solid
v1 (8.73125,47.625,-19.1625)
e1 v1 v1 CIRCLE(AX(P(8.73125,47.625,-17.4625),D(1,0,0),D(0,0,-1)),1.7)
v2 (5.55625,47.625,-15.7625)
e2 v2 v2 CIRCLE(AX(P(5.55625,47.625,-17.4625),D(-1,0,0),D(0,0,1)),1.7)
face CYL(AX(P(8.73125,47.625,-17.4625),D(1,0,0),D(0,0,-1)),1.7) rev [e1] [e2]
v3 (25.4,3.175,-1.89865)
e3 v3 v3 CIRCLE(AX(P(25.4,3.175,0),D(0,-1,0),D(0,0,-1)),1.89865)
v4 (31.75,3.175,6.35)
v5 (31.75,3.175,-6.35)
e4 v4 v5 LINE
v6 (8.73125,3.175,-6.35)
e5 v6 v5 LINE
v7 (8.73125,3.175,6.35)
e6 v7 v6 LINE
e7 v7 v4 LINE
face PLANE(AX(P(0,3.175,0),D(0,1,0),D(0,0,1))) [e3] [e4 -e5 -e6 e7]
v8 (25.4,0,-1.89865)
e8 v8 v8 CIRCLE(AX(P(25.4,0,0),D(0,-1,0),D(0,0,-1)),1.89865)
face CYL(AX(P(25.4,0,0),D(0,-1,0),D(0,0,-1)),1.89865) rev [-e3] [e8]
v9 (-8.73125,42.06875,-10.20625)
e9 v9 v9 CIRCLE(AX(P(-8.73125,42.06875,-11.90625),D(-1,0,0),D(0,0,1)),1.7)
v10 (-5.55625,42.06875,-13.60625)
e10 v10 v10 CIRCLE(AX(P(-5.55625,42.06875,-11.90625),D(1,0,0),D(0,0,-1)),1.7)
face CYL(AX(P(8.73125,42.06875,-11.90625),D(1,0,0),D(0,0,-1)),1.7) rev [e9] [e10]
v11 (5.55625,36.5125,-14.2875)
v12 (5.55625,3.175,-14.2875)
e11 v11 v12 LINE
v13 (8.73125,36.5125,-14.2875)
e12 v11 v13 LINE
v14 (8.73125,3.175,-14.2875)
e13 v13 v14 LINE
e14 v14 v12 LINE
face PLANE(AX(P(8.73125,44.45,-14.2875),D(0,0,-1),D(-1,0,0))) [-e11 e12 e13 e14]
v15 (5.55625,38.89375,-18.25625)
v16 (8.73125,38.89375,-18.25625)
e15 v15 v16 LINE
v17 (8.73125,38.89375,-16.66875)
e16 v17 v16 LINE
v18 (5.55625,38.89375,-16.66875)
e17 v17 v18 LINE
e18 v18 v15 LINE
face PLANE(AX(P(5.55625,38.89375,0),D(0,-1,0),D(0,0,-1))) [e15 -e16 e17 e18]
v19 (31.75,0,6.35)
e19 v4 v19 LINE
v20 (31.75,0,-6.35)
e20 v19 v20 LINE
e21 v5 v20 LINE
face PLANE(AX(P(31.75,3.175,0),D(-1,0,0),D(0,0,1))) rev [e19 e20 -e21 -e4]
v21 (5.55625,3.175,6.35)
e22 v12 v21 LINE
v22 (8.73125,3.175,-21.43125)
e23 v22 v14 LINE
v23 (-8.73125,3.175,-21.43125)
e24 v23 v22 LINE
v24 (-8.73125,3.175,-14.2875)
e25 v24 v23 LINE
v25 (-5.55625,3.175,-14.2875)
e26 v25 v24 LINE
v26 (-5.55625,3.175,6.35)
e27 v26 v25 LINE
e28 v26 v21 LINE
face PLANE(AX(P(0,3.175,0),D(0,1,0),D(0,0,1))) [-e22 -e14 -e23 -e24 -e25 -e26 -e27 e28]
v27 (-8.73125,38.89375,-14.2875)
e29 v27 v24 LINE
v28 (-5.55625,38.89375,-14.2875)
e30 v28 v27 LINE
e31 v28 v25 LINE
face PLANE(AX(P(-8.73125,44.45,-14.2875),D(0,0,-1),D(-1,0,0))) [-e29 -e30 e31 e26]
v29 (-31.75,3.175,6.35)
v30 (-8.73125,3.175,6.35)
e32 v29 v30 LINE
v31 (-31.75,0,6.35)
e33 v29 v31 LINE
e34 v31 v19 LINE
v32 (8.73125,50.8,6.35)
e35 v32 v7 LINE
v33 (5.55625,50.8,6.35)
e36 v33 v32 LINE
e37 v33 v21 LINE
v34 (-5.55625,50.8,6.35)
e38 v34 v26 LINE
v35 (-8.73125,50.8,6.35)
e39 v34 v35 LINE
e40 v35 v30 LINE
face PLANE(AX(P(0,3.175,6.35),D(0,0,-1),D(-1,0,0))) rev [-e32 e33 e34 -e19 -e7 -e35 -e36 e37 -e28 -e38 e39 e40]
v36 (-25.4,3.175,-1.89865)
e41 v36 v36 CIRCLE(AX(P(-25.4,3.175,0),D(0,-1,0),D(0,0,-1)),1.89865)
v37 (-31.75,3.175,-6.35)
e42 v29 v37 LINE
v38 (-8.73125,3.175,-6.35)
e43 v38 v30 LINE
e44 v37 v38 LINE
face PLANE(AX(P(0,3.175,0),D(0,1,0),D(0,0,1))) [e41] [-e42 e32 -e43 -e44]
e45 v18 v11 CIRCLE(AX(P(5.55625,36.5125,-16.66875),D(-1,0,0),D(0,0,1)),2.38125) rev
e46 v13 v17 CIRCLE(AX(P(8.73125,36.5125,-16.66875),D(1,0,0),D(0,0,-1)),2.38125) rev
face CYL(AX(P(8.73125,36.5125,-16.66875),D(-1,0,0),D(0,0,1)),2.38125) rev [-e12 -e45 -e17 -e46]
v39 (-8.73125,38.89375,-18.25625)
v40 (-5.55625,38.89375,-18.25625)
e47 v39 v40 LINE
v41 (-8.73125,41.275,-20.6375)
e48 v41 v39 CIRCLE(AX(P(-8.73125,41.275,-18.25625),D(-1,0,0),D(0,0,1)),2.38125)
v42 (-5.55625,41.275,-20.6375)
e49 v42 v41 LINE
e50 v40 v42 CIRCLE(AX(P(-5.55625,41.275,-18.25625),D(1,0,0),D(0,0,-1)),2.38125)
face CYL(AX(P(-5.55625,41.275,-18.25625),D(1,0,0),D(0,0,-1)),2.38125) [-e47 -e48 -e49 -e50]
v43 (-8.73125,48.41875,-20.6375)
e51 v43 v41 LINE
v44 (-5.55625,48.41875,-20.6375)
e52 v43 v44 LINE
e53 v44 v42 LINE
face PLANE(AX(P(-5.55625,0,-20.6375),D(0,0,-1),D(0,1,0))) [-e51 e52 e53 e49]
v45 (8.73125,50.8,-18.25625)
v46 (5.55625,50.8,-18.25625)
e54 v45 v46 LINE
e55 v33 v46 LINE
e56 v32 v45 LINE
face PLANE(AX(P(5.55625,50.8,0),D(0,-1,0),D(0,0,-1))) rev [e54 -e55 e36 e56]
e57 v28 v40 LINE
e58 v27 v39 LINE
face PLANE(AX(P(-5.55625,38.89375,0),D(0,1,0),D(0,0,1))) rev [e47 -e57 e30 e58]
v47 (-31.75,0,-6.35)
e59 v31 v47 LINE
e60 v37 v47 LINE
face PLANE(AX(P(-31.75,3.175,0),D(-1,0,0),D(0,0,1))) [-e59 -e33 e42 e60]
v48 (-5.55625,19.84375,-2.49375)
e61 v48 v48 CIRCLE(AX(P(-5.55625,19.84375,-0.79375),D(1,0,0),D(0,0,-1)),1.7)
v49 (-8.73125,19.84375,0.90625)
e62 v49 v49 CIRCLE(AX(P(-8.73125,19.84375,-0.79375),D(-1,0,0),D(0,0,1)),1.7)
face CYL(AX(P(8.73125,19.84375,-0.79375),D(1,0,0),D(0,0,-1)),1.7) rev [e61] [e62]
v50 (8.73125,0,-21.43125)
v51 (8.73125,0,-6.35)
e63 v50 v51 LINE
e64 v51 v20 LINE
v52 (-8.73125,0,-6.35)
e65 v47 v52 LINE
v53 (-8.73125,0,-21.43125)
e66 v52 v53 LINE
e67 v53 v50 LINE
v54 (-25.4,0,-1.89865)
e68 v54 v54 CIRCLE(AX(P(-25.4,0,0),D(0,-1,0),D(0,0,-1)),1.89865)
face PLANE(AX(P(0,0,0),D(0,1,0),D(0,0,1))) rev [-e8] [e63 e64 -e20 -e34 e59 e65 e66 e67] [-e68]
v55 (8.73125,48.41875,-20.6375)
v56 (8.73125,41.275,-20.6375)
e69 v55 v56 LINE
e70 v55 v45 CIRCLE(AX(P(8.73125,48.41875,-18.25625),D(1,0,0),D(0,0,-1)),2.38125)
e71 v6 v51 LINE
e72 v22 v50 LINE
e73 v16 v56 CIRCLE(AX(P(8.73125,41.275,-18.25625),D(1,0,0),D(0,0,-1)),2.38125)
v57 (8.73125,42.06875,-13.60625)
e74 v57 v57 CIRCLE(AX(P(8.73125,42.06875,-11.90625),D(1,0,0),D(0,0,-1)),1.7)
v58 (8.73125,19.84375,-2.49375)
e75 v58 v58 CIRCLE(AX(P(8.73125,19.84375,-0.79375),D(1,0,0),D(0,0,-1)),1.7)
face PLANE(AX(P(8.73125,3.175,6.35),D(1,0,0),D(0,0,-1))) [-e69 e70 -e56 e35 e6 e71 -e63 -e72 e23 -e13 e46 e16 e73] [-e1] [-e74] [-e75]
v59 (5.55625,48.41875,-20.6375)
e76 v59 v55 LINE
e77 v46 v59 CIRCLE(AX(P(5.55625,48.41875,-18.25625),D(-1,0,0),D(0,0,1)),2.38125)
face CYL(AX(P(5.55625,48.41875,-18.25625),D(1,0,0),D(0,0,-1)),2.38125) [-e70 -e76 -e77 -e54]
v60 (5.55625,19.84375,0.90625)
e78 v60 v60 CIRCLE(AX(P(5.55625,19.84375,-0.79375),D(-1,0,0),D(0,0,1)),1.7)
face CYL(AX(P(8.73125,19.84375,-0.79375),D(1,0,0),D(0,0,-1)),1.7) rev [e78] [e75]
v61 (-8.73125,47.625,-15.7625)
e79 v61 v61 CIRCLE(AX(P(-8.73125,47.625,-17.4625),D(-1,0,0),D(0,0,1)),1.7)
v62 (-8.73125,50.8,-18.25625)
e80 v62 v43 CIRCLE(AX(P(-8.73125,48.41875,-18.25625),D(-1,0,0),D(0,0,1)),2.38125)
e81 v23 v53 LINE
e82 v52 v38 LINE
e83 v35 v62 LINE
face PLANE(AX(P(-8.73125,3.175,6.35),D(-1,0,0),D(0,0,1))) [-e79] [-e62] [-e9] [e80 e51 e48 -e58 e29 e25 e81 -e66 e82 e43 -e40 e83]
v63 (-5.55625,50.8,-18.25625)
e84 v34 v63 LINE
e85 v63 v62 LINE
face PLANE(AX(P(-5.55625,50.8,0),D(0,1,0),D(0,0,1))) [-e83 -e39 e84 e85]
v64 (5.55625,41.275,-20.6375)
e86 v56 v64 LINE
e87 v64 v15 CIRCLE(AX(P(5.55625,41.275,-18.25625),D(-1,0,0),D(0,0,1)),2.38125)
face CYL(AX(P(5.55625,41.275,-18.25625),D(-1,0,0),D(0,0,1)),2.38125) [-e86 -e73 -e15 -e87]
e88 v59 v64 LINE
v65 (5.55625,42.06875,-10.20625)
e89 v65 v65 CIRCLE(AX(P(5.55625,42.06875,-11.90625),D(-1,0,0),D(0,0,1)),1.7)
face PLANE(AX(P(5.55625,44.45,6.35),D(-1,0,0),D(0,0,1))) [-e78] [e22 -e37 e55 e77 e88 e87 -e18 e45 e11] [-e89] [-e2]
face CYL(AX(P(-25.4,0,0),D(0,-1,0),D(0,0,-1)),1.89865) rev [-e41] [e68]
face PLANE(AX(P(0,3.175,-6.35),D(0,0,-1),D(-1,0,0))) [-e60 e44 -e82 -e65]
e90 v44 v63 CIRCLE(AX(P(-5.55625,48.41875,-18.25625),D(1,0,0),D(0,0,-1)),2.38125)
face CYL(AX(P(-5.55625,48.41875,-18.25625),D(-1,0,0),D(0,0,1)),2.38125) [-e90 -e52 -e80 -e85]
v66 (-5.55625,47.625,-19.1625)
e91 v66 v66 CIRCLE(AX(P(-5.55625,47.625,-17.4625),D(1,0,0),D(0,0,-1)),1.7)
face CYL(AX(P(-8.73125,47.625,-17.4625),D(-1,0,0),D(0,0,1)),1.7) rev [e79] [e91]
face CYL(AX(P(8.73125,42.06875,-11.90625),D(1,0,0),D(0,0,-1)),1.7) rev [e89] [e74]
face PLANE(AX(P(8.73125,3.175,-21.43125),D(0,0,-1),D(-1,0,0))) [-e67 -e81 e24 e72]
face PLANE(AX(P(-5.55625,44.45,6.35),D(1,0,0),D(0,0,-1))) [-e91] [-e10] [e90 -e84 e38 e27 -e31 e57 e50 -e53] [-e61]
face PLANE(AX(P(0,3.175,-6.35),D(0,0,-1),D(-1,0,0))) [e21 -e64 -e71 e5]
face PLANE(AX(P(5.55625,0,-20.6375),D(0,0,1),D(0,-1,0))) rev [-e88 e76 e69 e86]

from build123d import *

# Parameters (mm, degrees)
SKETCH1_W             = 63.5
SKETCH1_H             = 6.35
BOSS_EXTRUDE1_DEPTH   = 3.175
F_6_CLEARANCE_HOLE1_D = 3.7973
SKETCH7_W             = 17.4625
SKETCH7_H             = 27.78125
BOSS_EXTRUDE2_DEPTH   = 3.175
SKETCH9_W             = 3.175
SKETCH9_H             = 20.6375
BOSS_EXTRUDE3_DEPTH   = 44.45
M3_CLEARANCE_HOLE1_D  = 3.4
SKETCH14_W            = 20.6375
SKETCH14_H            = 6.35
BOSS_EXTRUDE4_DEPTH   = 3.175
FILLET3_R             = 2.38125
M3_CLEARANCE_HOLE2_D  = 3.4
MIRROR1_START         = -8.73125
MIRROR1_OUTLINE_R     = 1.7
MIRROR1_DEPTH         = 3.175


# Read off the part's stored shape, not the designer's step: Mirror1
with BuildPart() as part:
    # Sketch1 → Boss-Extrude1 (new body)
    with BuildSketch(Plane(origin=(0, 0, 0), x_dir=(1, 0, 0), z_dir=(0, 1, 0))):
        with Locations((0, -3.175)):
            Rectangle(SKETCH1_W, SKETCH1_H)
        with Locations((0, 3.175)):
            Rectangle(SKETCH1_W, SKETCH1_H)
    extrude(amount=BOSS_EXTRUDE1_DEPTH)

    # #6 Clearance Hole1 (through all)
    with Locations(Plane(origin=(0, 0, 0), x_dir=(-1, 0, 0), z_dir=(0, -1, 0))):
        with Locations((25.4, 0), (-25.4, 0)):
            Hole(F_6_CLEARANCE_HOLE1_D / 2)

    # Sketch7 → Boss-Extrude2 (add)
    with BuildSketch(Plane.XZ):
        with Locations((0, -7.540625)):
            Rectangle(SKETCH7_W, SKETCH7_H)
    extrude(amount=-BOSS_EXTRUDE2_DEPTH)

    # Sketch9 → Boss-Extrude3 (add)
    with BuildSketch(Plane.XZ):
        with Locations((7.14375, -3.96875)):
            Rectangle(SKETCH9_W, SKETCH9_H)
        with Locations((-7.14375, -3.96875)):
            Rectangle(SKETCH9_W, SKETCH9_H)
    extrude(amount=-BOSS_EXTRUDE3_DEPTH)

    # M3 Clearance Hole1 (through all)
    with Locations(Plane(origin=(8.73125, 0, 0), x_dir=(0, 0, -1), z_dir=(1, 0, 0))):
        with Locations((0.79375, 19.84375), (11.90625, 42.06875)):
            Hole(M3_CLEARANCE_HOLE1_D / 2)

    # Sketch14 → Boss-Extrude4 (add)
    with BuildSketch(Plane(origin=(8.73125, 0, 0), x_dir=(0, 0, -1), z_dir=(1, 0, 0))):
        with Locations((3.96875, 47.625)):
            Rectangle(SKETCH14_W, SKETCH14_H)
        Polygon((14.2875, 50.8), (14.2875, 44.45), (14.2875, 38.89375), (20.6375, 38.89375), (20.6375, 50.8), align=None)
    extrude(amount=-BOSS_EXTRUDE4_DEPTH)

    # Fillet3
    fillet3_edges = [part.edges().sort_by_distance(p)[0] for p in [
        (7.14375, 50.8, -20.6375),
        (7.14375, 38.89375, -20.6375),
        (7.14375, 38.89375, -14.2875),
    ]]
    fillet(fillet3_edges, radius=FILLET3_R)

    # M3 Clearance Hole2 (through all)
    with Locations(Plane(origin=(8.73125, 0, 0), x_dir=(0, 0, -1), z_dir=(1, 0, 0))):
        with Locations((17.4625, 47.625)):
            Hole(M3_CLEARANCE_HOLE2_D / 2)

    # Mirror1 outline → Mirror1 (add)
    with BuildSketch(Plane.YZ.offset(MIRROR1_START)):
        with BuildLine():
            ThreePointArc((48.41875, -20.6375), (50.102548023, -19.940048023), (50.8, -18.25625))
            Line((50.8, -18.25625), (50.8, 6.35))
            Line((50.8, 6.35), (44.45, 6.35))
            Line((44.45, 6.35), (44.45, -14.2875))
            Line((44.45, -14.2875), (38.89375, -14.2875))
            Line((38.89375, -14.2875), (38.89375, -18.25625))
            ThreePointArc((38.89375, -18.25625), (39.591201977, -19.940048023), (41.275, -20.6375))
            Line((41.275, -20.6375), (48.41875, -20.6375))
        make_face()
        with Locations((47.625, -17.4625)):
            Circle(MIRROR1_OUTLINE_R, mode=Mode.SUBTRACT)
    extrude(amount=MIRROR1_DEPTH)


solid = part.part
